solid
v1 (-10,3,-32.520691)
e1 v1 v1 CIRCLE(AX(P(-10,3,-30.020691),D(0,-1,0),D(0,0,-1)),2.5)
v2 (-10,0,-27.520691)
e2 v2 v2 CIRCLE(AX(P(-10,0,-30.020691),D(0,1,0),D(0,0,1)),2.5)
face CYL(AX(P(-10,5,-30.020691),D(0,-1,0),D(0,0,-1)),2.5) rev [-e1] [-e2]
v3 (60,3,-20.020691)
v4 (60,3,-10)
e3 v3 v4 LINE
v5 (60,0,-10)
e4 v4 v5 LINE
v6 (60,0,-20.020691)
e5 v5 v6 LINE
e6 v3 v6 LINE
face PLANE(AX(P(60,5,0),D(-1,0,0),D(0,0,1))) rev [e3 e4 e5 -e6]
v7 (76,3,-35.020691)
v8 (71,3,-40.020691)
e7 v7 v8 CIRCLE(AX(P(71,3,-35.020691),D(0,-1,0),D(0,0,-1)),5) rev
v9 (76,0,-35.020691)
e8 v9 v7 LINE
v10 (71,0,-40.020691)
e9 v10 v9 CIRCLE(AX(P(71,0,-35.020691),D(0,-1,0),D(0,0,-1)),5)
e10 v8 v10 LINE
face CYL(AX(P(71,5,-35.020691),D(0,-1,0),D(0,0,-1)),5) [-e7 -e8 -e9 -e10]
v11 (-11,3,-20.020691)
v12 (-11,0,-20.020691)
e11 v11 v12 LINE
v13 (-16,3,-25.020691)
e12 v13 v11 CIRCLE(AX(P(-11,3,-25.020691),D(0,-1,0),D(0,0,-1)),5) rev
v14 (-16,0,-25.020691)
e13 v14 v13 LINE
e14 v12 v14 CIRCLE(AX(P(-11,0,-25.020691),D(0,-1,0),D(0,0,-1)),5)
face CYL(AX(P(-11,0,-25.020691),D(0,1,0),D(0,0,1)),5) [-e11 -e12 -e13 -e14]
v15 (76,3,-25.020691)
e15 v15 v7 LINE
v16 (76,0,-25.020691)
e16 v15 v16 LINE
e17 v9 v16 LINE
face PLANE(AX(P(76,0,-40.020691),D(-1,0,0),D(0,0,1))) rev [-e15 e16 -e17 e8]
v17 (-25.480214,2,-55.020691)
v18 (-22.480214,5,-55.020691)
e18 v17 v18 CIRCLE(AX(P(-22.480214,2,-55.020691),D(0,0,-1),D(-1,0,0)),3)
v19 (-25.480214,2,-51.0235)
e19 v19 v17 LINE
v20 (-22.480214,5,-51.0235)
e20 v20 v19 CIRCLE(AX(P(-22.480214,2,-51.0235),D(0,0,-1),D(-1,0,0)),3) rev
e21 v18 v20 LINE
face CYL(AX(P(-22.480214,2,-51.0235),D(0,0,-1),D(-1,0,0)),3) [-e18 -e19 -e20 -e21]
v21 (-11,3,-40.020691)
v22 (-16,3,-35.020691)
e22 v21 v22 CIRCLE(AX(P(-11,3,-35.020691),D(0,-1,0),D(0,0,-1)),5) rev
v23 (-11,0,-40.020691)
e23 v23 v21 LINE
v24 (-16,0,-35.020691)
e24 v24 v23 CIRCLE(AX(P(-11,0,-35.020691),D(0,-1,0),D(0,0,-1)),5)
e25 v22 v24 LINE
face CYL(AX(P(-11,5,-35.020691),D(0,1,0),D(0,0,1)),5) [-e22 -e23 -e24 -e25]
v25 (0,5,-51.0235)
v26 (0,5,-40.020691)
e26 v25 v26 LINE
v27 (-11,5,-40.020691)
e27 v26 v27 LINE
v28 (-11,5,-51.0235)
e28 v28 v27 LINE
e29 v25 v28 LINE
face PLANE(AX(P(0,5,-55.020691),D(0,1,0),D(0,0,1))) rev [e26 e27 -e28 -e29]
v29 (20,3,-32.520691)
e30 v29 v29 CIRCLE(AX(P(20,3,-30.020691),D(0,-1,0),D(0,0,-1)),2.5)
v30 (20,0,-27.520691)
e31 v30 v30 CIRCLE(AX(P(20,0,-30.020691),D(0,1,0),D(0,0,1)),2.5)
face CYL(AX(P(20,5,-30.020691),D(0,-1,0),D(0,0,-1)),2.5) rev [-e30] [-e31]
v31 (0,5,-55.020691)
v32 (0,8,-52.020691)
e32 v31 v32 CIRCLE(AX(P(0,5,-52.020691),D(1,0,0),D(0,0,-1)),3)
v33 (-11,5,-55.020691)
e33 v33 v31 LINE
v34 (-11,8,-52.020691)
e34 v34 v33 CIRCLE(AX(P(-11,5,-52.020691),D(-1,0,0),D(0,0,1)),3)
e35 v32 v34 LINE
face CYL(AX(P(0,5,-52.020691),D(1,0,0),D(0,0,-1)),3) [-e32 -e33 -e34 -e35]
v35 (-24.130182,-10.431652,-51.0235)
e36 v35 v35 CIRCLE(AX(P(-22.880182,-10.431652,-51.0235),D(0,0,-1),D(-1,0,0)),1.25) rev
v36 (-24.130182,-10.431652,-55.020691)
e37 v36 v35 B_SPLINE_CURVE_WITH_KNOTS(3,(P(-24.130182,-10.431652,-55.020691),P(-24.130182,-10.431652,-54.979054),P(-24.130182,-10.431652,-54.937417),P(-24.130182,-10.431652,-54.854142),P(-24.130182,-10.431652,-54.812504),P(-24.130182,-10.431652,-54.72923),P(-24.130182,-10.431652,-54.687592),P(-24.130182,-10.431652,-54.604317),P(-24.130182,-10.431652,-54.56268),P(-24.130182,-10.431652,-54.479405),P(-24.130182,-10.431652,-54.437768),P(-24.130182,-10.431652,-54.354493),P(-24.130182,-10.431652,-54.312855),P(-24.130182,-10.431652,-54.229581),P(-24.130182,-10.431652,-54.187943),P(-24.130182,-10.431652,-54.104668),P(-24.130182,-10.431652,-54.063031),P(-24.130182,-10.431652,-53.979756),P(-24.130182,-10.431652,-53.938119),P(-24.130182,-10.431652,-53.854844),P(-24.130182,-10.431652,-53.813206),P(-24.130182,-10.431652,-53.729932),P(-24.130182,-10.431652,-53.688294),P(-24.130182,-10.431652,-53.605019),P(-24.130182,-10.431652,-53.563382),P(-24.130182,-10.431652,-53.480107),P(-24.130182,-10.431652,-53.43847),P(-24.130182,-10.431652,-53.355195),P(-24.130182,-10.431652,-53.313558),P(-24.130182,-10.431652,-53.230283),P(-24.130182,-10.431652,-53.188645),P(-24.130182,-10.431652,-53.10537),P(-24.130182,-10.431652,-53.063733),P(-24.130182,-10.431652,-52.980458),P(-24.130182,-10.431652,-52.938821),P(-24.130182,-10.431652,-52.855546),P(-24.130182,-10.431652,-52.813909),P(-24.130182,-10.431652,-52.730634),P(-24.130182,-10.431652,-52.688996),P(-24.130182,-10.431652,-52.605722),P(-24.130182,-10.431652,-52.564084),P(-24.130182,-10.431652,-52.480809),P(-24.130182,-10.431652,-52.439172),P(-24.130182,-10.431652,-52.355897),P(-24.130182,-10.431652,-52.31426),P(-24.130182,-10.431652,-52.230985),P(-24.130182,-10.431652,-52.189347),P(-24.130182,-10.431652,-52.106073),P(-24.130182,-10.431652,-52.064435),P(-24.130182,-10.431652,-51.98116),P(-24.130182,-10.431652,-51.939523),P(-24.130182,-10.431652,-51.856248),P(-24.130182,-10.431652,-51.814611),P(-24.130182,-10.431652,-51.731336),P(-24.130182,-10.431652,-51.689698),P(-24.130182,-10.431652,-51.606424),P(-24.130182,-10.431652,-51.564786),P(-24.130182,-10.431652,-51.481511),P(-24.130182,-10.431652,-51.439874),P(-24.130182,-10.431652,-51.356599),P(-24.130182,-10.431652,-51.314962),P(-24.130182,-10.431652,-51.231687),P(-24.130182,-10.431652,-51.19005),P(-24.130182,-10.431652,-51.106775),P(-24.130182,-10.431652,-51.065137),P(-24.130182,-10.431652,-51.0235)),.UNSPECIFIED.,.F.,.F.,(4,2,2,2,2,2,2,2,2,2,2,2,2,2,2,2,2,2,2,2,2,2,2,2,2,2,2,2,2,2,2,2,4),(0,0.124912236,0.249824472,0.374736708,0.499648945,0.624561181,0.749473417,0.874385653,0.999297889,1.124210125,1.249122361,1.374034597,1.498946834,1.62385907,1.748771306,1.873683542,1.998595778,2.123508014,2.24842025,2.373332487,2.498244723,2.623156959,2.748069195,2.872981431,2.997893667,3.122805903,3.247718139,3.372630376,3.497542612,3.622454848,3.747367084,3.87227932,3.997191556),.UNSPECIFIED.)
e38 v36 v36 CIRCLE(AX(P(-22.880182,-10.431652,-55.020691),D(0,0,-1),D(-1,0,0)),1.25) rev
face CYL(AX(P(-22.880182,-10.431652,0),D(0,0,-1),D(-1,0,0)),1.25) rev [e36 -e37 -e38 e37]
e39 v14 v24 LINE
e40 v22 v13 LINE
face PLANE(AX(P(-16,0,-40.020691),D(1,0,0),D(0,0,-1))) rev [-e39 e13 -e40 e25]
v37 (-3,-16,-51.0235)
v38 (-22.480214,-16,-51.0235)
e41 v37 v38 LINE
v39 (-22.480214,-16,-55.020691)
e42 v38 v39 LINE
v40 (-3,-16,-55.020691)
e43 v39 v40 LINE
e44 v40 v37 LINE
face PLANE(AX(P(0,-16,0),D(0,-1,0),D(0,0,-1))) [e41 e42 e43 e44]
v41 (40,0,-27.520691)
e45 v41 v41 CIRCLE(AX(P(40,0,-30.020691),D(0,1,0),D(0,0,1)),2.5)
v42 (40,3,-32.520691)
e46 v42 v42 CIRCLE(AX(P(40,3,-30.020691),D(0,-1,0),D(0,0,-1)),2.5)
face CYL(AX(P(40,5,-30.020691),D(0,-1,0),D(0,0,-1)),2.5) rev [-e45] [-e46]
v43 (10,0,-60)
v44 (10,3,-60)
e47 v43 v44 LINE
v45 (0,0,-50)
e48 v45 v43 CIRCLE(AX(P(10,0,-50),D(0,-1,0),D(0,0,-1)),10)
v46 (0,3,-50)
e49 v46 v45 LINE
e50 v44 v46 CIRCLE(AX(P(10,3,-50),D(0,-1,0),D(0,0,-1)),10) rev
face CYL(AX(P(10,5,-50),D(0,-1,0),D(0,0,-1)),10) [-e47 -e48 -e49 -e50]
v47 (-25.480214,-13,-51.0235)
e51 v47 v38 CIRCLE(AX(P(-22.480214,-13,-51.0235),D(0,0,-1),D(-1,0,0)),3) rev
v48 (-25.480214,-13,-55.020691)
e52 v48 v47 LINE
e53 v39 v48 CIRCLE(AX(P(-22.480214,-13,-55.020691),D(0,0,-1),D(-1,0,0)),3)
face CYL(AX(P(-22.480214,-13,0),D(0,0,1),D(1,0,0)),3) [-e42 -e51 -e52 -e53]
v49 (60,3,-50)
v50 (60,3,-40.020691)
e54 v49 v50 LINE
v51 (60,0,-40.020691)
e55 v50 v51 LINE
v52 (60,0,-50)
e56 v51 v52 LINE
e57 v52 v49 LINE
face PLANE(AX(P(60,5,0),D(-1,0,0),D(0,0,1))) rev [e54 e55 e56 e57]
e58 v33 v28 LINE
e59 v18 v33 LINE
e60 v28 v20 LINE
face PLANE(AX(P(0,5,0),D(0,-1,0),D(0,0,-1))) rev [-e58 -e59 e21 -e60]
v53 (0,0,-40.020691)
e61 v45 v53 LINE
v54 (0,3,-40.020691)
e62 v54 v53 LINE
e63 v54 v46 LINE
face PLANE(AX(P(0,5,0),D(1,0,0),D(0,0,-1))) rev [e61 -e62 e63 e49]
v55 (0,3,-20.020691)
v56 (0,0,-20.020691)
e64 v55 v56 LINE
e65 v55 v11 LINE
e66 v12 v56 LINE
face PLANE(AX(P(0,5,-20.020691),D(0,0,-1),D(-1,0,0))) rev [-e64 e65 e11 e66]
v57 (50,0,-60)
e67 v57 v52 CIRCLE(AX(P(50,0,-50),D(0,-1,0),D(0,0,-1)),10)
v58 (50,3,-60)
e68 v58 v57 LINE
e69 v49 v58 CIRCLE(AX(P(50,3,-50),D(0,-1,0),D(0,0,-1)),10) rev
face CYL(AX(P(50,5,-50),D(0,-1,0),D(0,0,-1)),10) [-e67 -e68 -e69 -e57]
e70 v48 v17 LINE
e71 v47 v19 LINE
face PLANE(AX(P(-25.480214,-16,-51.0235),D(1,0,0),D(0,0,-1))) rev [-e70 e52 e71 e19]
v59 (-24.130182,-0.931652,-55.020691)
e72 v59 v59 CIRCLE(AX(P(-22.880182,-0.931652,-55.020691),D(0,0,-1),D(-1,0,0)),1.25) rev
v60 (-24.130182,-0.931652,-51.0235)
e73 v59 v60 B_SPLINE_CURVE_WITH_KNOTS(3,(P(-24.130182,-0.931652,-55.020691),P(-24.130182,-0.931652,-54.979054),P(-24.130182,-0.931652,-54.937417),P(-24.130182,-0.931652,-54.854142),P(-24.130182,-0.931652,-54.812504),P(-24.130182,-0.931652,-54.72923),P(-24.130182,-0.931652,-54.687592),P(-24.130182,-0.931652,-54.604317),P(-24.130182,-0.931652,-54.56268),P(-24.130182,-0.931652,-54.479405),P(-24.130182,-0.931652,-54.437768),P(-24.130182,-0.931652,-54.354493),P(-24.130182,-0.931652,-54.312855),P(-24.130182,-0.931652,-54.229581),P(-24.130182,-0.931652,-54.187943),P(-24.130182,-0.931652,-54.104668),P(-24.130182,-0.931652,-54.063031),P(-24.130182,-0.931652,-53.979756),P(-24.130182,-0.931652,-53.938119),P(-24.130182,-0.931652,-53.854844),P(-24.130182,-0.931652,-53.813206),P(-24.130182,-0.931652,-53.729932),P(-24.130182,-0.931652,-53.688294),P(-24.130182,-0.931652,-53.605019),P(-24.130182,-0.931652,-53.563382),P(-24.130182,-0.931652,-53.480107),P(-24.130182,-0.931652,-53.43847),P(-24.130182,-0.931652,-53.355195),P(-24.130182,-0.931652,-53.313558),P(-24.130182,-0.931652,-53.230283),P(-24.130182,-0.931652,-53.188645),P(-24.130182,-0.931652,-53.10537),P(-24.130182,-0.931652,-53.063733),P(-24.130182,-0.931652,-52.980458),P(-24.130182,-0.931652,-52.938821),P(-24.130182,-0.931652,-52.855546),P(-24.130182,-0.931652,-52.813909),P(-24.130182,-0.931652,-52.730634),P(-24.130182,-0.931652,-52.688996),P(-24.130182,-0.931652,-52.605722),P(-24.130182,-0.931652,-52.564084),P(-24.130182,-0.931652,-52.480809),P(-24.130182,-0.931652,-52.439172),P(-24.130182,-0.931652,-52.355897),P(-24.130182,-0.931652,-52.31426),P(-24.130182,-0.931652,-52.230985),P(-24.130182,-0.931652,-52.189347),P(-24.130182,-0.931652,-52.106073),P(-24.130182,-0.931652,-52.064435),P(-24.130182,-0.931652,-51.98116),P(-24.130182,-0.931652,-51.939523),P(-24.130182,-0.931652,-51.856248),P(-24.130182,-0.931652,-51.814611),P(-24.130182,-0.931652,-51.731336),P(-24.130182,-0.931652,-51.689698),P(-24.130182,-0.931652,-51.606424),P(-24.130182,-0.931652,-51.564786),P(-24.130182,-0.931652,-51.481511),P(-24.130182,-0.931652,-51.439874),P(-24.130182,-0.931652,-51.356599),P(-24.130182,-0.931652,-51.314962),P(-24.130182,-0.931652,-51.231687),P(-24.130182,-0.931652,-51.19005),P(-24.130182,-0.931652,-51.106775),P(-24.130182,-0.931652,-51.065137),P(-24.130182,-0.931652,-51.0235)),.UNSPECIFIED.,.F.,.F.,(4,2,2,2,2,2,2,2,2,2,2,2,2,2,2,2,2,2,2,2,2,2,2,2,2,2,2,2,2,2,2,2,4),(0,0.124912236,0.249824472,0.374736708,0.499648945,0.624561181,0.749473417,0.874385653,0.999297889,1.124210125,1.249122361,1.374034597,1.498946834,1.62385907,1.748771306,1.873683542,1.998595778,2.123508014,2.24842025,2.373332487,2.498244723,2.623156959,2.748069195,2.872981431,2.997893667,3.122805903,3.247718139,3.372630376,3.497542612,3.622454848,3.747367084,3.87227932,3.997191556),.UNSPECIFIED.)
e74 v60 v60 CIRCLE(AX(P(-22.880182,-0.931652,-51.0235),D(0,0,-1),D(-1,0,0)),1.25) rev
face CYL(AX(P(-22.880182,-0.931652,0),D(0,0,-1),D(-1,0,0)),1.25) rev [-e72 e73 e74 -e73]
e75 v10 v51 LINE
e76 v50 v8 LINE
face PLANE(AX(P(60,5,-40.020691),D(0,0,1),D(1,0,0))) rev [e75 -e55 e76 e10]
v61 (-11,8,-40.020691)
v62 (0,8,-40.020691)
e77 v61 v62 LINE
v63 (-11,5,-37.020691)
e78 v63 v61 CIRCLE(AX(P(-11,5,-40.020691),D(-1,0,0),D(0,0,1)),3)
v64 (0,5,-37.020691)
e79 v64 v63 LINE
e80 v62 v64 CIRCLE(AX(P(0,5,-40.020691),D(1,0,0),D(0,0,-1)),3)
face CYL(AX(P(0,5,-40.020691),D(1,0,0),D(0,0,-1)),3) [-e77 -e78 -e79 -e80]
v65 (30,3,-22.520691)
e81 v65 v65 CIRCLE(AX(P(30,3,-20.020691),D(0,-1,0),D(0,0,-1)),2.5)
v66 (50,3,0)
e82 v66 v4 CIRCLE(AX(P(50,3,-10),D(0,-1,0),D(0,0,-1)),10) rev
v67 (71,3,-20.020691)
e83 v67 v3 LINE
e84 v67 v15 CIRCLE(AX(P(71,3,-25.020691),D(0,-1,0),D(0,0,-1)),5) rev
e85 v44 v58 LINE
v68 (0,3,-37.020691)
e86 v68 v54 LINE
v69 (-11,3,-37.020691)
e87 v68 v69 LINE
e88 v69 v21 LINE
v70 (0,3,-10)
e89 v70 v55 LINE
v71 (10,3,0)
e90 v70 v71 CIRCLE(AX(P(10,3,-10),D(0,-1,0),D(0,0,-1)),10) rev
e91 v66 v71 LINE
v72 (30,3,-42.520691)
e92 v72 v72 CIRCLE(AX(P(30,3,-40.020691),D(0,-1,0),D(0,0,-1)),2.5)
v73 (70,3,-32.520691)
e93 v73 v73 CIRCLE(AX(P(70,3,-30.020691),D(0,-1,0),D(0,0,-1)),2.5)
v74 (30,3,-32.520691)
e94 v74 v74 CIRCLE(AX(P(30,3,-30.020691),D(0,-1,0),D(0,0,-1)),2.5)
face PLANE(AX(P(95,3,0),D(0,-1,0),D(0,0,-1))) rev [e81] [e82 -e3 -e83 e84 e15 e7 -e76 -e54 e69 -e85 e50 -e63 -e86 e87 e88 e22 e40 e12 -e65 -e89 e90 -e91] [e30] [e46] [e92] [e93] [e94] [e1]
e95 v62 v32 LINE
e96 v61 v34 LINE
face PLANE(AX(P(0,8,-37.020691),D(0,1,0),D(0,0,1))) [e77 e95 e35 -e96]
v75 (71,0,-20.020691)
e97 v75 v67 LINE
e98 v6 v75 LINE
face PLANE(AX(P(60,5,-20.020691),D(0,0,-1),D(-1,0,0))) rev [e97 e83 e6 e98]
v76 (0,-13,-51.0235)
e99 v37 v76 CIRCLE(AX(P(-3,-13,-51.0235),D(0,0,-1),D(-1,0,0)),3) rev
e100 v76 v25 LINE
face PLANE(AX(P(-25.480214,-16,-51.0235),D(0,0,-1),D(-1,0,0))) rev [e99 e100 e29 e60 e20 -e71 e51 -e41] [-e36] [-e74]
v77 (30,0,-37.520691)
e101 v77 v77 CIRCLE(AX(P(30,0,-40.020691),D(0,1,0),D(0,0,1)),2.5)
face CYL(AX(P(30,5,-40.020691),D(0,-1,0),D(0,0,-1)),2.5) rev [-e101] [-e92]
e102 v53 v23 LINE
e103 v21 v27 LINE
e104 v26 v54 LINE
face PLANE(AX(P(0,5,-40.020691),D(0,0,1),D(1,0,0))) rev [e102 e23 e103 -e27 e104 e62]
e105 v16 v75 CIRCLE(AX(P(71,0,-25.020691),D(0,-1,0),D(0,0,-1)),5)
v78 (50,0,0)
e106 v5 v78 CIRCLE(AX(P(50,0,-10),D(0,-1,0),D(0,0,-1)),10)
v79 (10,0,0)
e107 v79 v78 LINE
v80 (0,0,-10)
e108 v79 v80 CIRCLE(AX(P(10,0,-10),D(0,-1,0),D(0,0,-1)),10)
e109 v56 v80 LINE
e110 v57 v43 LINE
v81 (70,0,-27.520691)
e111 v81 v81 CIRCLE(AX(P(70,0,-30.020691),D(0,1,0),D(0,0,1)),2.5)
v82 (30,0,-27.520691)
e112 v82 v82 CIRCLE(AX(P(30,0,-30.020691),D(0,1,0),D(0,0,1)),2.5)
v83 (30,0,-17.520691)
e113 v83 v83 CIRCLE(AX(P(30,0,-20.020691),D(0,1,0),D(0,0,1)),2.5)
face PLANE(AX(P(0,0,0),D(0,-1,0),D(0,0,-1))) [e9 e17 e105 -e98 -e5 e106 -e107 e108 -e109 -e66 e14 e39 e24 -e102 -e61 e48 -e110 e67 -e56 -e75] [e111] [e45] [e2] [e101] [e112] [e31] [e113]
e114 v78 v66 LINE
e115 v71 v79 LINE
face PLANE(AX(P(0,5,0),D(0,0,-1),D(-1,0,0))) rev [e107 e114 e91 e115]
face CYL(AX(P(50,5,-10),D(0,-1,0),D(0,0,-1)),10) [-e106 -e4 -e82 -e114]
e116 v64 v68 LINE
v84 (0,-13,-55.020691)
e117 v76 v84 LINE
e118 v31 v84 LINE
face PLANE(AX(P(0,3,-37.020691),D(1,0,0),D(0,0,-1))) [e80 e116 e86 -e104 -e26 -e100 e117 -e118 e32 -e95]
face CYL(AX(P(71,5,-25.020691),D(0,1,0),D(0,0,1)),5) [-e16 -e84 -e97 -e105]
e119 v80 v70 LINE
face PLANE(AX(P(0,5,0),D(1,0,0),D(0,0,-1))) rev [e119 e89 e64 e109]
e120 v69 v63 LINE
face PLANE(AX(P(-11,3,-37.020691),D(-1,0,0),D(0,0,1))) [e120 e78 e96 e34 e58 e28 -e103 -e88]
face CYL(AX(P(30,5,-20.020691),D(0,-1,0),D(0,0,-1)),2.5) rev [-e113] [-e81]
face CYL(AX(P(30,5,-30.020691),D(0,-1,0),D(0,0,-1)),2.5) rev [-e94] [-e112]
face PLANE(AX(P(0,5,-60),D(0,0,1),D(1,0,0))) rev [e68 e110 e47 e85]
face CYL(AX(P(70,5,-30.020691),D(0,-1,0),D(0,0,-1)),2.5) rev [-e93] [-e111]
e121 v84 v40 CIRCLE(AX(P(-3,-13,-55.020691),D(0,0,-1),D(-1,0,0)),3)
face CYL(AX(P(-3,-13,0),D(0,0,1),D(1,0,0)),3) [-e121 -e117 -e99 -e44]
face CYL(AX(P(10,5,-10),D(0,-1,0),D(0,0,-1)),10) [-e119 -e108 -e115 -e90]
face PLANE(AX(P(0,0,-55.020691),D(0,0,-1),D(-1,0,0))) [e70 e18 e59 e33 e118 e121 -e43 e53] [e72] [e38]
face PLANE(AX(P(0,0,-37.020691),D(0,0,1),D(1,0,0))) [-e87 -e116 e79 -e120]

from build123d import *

# Parameters (mm, degrees)
SKETCH1_W               = 60
SKETCH1_H               = 60
SKETCH1_R               = 2.5
BOSS_EXTRUDE2_DEPTH     = 5
SKETCH3_W               = 35
SKETCH3_H               = 20
BOSS_EXTRUDE3_DEPTH     = 5
SKETCH5_R               = 2.5
CUT_EXTRUDE1_DEPTH      = 113.472218792
FILLET1_R               = 10
FILLET2_R               = 10
FILLET3_R               = 10
CUT_EXTRUDE2_DEPTH      = 113.472218792
CUT_EXTRUDE2_DEPTH_BACK = 113.472218792
SKETCH6_W               = 130
SKETCH6_H               = 2
CUT_EXTRUDE4_DEPTH      = 113.401067611
CUT_EXTRUDE4_DEPTH_BACK = 113.401067611
FILLET4_R               = 5
SKETCH8_W               = 11
SKETCH8_H               = 5
BOSS_EXTRUDE4_DEPTH     = 3
SKETCH9_W               = 11
SKETCH9_H               = 3
BOSS_EXTRUDE5_DEPTH     = 15
BOSS_EXTRUDE6_DEPTH     = 21
CUT_EXTRUDE5_DEPTH      = 93.926839714
CUT_EXTRUDE5_DEPTH_BACK = 10
SKETCH11_R              = 1.25
FILLET5_R               = 3


with BuildPart() as part:
    # Sketch1 → Boss-Extrude2 (new body)
    with BuildSketch(Plane(origin=(0, 0, 0), x_dir=(1, 0, 0), z_dir=(0, 1, 0))):
        with Locations((30, 30)):
            Rectangle(SKETCH1_W, SKETCH1_H)
        with Locations(Location((30, 40.020691429, 0), (0, 0, 270))):
            Circle(SKETCH1_R, mode=Mode.SUBTRACT)
        with Locations(Location((20, 30.020691429, 0), (0, 0, 270))):
            Circle(SKETCH1_R, mode=Mode.SUBTRACT)
        with Locations(Location((30, 20.020691429, 0), (0, 0, 270))):
            Circle(SKETCH1_R, mode=Mode.SUBTRACT)
        with Locations(Location((40, 30.020691429, 0), (0, 0, 270))):
            Circle(SKETCH1_R, mode=Mode.SUBTRACT)
        with Locations(Location((30, 30.020691429, 0), (0, 0, 270))):
            Circle(SKETCH1_R, mode=Mode.SUBTRACT)
    extrude(amount=BOSS_EXTRUDE2_DEPTH)

    # Sketch3 → Boss-Extrude3 (add)
    with BuildSketch(Plane(origin=(0, 0, 0), x_dir=(1, 0, 0), z_dir=(0, 1, 0))):
        with Locations((77.5, 30.020691429)):
            Rectangle(SKETCH3_W, SKETCH3_H)
        with Locations((-17.5, 30.020691429)):
            Rectangle(SKETCH3_W, SKETCH3_H)
    extrude(amount=BOSS_EXTRUDE3_DEPTH)

    # Sketch5 → Cut-Extrude1 (cut, through all)
    with BuildSketch(Plane(origin=(0, 0, 0), x_dir=(1, 0, 0), z_dir=(0, 1, 0))):
        with Locations(Location((70, 30.020691429, 0), (0, 0, 270))):
            Circle(SKETCH5_R)
        with Locations(Location((-10, 30.020691429, 0), (0, 0, 270))):
            Circle(SKETCH5_R)
    extrude(amount=CUT_EXTRUDE1_DEPTH, mode=Mode.SUBTRACT)

    # Fillet1
    fillet1_edges = [part.edges().sort_by_distance(p)[0] for p in [
        (95, 2.5, -20.020691429),
        (95, 2.5, -40.020691429),
    ]]
    fillet(fillet1_edges, radius=FILLET1_R - 0.0001)  # a hair under: the kernel refuses the full size

    # Fillet2
    fillet2_edges = [part.edges().sort_by_distance(p)[0] for p in [
        (-35, 2.5, -20.020691429),
        (-35, 2.5, -40.020691429),
    ]]
    fillet(fillet2_edges, radius=FILLET2_R - 0.0001)  # a hair under: the kernel refuses the full size

    # Fillet3
    fillet3_edges = [part.edges().sort_by_distance(p)[0] for p in [
        (0, 2.5, -60),
        (60, 2.5, -60),
        (60, 2.5, 0),
        (0, 2.5, 0),
    ]]
    fillet(fillet3_edges, radius=FILLET3_R)

    # Sketch6 → Cut-Extrude2 (cut, two sides: drawn at the far end of the back side and taken through both)
    with BuildSketch(Plane(origin=(0, 0, -60), x_dir=(-1, 0, 0), z_dir=(0, 0, -1)).offset(-CUT_EXTRUDE2_DEPTH_BACK)):
        with Locations((-30, 4)):
            Rectangle(SKETCH6_W, SKETCH6_H)
    extrude(amount=CUT_EXTRUDE2_DEPTH + CUT_EXTRUDE2_DEPTH_BACK, mode=Mode.SUBTRACT)

    # Sketch7 → Cut-Extrude4 (cut, two sides: drawn at the far end of the back side and taken through both)
    with BuildSketch(Plane(origin=(0, 3, 0), x_dir=(1, 0, 0), z_dir=(0, 1, 0)).offset(-CUT_EXTRUDE4_DEPTH_BACK)):
        Polygon((-16, 40.020691429), (-16, 42.339149427), (-38.923164287, 42.339149427), (-38.923164287, 39.725242292), (-38.923164287, 20.020691429), (-16, 20.020691429), align=None)
        Polygon((98.923164287, 20.020691429), (98.923164287, 39.725242292), (98.923164287, 44.006554538), (76, 44.006554538), (76, 40.020691429), (76, 20.020691429), align=None)
    extrude(amount=CUT_EXTRUDE4_DEPTH + CUT_EXTRUDE4_DEPTH_BACK, mode=Mode.SUBTRACT)

    # Fillet4
    fillet4_edges = [part.edges().sort_by_distance(p)[0] for p in [
        (-16, 1.5, -20.020691429),
        (-16, 1.5, -40.020691429),
        (76, 1.5, -40.020691429),
        (76, 1.5, -20.020691429),
    ]]
    fillet(fillet4_edges, radius=FILLET4_R)

    # Sketch8 → Boss-Extrude4 (add)
    with BuildSketch(Plane(origin=(0, 0, -40.020691429), x_dir=(-1, 0, 0), z_dir=(0, 0, -1))):
        with Locations((5.5, 5.5)):
            Rectangle(SKETCH8_W, SKETCH8_H)
    extrude(amount=-BOSS_EXTRUDE4_DEPTH)

    # Sketch9 → Boss-Extrude5 (add)
    with BuildSketch(Plane(origin=(0, 0, -40.020691429), x_dir=(-1, 0, 0), z_dir=(0, 0, -1))):
        with Locations((5.5, 6.5)):
            Rectangle(SKETCH9_W, SKETCH9_H)
    extrude(amount=BOSS_EXTRUDE5_DEPTH)

    # Sketch10 → Boss-Extrude6 (add)
    with BuildSketch(Plane.XZ.offset(-5)):
        Polygon((-25.480214152, -51.023499873), (-25.480214152, -55.020691429), (-11, -55.020691429), (0, -55.020691429), (0, -51.023499873), align=None)
    extrude(amount=BOSS_EXTRUDE6_DEPTH)

    # Sketch11 → Cut-Extrude5 (cut, two sides: drawn at the far end of the back side and taken through both)
    with BuildSketch(Plane.XY.offset(-51.023499873).offset(-CUT_EXTRUDE5_DEPTH_BACK)):
        with Locations(Location((-22.880182159, -0.931652135, 0), (0, 0, 180))):
            Circle(SKETCH11_R)
        with Locations(Location((-22.880182159, -10.431652135, 0), (0, 0, 180))):
            Circle(SKETCH11_R)
    extrude(amount=CUT_EXTRUDE5_DEPTH + CUT_EXTRUDE5_DEPTH_BACK, mode=Mode.SUBTRACT)

    # Fillet5
    fillet5_edges = [part.edges().sort_by_distance(p)[0] for p in [
        (-5.5, 8, -37.020691429),
        (-5.5, 8, -55.020691429),
        (0, -16, -53.022095651),
        (-25.480214152, 5, -53.022095651),
        (-25.480214152, -16, -53.022095651),
    ]]
    fillet(fillet5_edges, radius=FILLET5_R)


solid = part.part
